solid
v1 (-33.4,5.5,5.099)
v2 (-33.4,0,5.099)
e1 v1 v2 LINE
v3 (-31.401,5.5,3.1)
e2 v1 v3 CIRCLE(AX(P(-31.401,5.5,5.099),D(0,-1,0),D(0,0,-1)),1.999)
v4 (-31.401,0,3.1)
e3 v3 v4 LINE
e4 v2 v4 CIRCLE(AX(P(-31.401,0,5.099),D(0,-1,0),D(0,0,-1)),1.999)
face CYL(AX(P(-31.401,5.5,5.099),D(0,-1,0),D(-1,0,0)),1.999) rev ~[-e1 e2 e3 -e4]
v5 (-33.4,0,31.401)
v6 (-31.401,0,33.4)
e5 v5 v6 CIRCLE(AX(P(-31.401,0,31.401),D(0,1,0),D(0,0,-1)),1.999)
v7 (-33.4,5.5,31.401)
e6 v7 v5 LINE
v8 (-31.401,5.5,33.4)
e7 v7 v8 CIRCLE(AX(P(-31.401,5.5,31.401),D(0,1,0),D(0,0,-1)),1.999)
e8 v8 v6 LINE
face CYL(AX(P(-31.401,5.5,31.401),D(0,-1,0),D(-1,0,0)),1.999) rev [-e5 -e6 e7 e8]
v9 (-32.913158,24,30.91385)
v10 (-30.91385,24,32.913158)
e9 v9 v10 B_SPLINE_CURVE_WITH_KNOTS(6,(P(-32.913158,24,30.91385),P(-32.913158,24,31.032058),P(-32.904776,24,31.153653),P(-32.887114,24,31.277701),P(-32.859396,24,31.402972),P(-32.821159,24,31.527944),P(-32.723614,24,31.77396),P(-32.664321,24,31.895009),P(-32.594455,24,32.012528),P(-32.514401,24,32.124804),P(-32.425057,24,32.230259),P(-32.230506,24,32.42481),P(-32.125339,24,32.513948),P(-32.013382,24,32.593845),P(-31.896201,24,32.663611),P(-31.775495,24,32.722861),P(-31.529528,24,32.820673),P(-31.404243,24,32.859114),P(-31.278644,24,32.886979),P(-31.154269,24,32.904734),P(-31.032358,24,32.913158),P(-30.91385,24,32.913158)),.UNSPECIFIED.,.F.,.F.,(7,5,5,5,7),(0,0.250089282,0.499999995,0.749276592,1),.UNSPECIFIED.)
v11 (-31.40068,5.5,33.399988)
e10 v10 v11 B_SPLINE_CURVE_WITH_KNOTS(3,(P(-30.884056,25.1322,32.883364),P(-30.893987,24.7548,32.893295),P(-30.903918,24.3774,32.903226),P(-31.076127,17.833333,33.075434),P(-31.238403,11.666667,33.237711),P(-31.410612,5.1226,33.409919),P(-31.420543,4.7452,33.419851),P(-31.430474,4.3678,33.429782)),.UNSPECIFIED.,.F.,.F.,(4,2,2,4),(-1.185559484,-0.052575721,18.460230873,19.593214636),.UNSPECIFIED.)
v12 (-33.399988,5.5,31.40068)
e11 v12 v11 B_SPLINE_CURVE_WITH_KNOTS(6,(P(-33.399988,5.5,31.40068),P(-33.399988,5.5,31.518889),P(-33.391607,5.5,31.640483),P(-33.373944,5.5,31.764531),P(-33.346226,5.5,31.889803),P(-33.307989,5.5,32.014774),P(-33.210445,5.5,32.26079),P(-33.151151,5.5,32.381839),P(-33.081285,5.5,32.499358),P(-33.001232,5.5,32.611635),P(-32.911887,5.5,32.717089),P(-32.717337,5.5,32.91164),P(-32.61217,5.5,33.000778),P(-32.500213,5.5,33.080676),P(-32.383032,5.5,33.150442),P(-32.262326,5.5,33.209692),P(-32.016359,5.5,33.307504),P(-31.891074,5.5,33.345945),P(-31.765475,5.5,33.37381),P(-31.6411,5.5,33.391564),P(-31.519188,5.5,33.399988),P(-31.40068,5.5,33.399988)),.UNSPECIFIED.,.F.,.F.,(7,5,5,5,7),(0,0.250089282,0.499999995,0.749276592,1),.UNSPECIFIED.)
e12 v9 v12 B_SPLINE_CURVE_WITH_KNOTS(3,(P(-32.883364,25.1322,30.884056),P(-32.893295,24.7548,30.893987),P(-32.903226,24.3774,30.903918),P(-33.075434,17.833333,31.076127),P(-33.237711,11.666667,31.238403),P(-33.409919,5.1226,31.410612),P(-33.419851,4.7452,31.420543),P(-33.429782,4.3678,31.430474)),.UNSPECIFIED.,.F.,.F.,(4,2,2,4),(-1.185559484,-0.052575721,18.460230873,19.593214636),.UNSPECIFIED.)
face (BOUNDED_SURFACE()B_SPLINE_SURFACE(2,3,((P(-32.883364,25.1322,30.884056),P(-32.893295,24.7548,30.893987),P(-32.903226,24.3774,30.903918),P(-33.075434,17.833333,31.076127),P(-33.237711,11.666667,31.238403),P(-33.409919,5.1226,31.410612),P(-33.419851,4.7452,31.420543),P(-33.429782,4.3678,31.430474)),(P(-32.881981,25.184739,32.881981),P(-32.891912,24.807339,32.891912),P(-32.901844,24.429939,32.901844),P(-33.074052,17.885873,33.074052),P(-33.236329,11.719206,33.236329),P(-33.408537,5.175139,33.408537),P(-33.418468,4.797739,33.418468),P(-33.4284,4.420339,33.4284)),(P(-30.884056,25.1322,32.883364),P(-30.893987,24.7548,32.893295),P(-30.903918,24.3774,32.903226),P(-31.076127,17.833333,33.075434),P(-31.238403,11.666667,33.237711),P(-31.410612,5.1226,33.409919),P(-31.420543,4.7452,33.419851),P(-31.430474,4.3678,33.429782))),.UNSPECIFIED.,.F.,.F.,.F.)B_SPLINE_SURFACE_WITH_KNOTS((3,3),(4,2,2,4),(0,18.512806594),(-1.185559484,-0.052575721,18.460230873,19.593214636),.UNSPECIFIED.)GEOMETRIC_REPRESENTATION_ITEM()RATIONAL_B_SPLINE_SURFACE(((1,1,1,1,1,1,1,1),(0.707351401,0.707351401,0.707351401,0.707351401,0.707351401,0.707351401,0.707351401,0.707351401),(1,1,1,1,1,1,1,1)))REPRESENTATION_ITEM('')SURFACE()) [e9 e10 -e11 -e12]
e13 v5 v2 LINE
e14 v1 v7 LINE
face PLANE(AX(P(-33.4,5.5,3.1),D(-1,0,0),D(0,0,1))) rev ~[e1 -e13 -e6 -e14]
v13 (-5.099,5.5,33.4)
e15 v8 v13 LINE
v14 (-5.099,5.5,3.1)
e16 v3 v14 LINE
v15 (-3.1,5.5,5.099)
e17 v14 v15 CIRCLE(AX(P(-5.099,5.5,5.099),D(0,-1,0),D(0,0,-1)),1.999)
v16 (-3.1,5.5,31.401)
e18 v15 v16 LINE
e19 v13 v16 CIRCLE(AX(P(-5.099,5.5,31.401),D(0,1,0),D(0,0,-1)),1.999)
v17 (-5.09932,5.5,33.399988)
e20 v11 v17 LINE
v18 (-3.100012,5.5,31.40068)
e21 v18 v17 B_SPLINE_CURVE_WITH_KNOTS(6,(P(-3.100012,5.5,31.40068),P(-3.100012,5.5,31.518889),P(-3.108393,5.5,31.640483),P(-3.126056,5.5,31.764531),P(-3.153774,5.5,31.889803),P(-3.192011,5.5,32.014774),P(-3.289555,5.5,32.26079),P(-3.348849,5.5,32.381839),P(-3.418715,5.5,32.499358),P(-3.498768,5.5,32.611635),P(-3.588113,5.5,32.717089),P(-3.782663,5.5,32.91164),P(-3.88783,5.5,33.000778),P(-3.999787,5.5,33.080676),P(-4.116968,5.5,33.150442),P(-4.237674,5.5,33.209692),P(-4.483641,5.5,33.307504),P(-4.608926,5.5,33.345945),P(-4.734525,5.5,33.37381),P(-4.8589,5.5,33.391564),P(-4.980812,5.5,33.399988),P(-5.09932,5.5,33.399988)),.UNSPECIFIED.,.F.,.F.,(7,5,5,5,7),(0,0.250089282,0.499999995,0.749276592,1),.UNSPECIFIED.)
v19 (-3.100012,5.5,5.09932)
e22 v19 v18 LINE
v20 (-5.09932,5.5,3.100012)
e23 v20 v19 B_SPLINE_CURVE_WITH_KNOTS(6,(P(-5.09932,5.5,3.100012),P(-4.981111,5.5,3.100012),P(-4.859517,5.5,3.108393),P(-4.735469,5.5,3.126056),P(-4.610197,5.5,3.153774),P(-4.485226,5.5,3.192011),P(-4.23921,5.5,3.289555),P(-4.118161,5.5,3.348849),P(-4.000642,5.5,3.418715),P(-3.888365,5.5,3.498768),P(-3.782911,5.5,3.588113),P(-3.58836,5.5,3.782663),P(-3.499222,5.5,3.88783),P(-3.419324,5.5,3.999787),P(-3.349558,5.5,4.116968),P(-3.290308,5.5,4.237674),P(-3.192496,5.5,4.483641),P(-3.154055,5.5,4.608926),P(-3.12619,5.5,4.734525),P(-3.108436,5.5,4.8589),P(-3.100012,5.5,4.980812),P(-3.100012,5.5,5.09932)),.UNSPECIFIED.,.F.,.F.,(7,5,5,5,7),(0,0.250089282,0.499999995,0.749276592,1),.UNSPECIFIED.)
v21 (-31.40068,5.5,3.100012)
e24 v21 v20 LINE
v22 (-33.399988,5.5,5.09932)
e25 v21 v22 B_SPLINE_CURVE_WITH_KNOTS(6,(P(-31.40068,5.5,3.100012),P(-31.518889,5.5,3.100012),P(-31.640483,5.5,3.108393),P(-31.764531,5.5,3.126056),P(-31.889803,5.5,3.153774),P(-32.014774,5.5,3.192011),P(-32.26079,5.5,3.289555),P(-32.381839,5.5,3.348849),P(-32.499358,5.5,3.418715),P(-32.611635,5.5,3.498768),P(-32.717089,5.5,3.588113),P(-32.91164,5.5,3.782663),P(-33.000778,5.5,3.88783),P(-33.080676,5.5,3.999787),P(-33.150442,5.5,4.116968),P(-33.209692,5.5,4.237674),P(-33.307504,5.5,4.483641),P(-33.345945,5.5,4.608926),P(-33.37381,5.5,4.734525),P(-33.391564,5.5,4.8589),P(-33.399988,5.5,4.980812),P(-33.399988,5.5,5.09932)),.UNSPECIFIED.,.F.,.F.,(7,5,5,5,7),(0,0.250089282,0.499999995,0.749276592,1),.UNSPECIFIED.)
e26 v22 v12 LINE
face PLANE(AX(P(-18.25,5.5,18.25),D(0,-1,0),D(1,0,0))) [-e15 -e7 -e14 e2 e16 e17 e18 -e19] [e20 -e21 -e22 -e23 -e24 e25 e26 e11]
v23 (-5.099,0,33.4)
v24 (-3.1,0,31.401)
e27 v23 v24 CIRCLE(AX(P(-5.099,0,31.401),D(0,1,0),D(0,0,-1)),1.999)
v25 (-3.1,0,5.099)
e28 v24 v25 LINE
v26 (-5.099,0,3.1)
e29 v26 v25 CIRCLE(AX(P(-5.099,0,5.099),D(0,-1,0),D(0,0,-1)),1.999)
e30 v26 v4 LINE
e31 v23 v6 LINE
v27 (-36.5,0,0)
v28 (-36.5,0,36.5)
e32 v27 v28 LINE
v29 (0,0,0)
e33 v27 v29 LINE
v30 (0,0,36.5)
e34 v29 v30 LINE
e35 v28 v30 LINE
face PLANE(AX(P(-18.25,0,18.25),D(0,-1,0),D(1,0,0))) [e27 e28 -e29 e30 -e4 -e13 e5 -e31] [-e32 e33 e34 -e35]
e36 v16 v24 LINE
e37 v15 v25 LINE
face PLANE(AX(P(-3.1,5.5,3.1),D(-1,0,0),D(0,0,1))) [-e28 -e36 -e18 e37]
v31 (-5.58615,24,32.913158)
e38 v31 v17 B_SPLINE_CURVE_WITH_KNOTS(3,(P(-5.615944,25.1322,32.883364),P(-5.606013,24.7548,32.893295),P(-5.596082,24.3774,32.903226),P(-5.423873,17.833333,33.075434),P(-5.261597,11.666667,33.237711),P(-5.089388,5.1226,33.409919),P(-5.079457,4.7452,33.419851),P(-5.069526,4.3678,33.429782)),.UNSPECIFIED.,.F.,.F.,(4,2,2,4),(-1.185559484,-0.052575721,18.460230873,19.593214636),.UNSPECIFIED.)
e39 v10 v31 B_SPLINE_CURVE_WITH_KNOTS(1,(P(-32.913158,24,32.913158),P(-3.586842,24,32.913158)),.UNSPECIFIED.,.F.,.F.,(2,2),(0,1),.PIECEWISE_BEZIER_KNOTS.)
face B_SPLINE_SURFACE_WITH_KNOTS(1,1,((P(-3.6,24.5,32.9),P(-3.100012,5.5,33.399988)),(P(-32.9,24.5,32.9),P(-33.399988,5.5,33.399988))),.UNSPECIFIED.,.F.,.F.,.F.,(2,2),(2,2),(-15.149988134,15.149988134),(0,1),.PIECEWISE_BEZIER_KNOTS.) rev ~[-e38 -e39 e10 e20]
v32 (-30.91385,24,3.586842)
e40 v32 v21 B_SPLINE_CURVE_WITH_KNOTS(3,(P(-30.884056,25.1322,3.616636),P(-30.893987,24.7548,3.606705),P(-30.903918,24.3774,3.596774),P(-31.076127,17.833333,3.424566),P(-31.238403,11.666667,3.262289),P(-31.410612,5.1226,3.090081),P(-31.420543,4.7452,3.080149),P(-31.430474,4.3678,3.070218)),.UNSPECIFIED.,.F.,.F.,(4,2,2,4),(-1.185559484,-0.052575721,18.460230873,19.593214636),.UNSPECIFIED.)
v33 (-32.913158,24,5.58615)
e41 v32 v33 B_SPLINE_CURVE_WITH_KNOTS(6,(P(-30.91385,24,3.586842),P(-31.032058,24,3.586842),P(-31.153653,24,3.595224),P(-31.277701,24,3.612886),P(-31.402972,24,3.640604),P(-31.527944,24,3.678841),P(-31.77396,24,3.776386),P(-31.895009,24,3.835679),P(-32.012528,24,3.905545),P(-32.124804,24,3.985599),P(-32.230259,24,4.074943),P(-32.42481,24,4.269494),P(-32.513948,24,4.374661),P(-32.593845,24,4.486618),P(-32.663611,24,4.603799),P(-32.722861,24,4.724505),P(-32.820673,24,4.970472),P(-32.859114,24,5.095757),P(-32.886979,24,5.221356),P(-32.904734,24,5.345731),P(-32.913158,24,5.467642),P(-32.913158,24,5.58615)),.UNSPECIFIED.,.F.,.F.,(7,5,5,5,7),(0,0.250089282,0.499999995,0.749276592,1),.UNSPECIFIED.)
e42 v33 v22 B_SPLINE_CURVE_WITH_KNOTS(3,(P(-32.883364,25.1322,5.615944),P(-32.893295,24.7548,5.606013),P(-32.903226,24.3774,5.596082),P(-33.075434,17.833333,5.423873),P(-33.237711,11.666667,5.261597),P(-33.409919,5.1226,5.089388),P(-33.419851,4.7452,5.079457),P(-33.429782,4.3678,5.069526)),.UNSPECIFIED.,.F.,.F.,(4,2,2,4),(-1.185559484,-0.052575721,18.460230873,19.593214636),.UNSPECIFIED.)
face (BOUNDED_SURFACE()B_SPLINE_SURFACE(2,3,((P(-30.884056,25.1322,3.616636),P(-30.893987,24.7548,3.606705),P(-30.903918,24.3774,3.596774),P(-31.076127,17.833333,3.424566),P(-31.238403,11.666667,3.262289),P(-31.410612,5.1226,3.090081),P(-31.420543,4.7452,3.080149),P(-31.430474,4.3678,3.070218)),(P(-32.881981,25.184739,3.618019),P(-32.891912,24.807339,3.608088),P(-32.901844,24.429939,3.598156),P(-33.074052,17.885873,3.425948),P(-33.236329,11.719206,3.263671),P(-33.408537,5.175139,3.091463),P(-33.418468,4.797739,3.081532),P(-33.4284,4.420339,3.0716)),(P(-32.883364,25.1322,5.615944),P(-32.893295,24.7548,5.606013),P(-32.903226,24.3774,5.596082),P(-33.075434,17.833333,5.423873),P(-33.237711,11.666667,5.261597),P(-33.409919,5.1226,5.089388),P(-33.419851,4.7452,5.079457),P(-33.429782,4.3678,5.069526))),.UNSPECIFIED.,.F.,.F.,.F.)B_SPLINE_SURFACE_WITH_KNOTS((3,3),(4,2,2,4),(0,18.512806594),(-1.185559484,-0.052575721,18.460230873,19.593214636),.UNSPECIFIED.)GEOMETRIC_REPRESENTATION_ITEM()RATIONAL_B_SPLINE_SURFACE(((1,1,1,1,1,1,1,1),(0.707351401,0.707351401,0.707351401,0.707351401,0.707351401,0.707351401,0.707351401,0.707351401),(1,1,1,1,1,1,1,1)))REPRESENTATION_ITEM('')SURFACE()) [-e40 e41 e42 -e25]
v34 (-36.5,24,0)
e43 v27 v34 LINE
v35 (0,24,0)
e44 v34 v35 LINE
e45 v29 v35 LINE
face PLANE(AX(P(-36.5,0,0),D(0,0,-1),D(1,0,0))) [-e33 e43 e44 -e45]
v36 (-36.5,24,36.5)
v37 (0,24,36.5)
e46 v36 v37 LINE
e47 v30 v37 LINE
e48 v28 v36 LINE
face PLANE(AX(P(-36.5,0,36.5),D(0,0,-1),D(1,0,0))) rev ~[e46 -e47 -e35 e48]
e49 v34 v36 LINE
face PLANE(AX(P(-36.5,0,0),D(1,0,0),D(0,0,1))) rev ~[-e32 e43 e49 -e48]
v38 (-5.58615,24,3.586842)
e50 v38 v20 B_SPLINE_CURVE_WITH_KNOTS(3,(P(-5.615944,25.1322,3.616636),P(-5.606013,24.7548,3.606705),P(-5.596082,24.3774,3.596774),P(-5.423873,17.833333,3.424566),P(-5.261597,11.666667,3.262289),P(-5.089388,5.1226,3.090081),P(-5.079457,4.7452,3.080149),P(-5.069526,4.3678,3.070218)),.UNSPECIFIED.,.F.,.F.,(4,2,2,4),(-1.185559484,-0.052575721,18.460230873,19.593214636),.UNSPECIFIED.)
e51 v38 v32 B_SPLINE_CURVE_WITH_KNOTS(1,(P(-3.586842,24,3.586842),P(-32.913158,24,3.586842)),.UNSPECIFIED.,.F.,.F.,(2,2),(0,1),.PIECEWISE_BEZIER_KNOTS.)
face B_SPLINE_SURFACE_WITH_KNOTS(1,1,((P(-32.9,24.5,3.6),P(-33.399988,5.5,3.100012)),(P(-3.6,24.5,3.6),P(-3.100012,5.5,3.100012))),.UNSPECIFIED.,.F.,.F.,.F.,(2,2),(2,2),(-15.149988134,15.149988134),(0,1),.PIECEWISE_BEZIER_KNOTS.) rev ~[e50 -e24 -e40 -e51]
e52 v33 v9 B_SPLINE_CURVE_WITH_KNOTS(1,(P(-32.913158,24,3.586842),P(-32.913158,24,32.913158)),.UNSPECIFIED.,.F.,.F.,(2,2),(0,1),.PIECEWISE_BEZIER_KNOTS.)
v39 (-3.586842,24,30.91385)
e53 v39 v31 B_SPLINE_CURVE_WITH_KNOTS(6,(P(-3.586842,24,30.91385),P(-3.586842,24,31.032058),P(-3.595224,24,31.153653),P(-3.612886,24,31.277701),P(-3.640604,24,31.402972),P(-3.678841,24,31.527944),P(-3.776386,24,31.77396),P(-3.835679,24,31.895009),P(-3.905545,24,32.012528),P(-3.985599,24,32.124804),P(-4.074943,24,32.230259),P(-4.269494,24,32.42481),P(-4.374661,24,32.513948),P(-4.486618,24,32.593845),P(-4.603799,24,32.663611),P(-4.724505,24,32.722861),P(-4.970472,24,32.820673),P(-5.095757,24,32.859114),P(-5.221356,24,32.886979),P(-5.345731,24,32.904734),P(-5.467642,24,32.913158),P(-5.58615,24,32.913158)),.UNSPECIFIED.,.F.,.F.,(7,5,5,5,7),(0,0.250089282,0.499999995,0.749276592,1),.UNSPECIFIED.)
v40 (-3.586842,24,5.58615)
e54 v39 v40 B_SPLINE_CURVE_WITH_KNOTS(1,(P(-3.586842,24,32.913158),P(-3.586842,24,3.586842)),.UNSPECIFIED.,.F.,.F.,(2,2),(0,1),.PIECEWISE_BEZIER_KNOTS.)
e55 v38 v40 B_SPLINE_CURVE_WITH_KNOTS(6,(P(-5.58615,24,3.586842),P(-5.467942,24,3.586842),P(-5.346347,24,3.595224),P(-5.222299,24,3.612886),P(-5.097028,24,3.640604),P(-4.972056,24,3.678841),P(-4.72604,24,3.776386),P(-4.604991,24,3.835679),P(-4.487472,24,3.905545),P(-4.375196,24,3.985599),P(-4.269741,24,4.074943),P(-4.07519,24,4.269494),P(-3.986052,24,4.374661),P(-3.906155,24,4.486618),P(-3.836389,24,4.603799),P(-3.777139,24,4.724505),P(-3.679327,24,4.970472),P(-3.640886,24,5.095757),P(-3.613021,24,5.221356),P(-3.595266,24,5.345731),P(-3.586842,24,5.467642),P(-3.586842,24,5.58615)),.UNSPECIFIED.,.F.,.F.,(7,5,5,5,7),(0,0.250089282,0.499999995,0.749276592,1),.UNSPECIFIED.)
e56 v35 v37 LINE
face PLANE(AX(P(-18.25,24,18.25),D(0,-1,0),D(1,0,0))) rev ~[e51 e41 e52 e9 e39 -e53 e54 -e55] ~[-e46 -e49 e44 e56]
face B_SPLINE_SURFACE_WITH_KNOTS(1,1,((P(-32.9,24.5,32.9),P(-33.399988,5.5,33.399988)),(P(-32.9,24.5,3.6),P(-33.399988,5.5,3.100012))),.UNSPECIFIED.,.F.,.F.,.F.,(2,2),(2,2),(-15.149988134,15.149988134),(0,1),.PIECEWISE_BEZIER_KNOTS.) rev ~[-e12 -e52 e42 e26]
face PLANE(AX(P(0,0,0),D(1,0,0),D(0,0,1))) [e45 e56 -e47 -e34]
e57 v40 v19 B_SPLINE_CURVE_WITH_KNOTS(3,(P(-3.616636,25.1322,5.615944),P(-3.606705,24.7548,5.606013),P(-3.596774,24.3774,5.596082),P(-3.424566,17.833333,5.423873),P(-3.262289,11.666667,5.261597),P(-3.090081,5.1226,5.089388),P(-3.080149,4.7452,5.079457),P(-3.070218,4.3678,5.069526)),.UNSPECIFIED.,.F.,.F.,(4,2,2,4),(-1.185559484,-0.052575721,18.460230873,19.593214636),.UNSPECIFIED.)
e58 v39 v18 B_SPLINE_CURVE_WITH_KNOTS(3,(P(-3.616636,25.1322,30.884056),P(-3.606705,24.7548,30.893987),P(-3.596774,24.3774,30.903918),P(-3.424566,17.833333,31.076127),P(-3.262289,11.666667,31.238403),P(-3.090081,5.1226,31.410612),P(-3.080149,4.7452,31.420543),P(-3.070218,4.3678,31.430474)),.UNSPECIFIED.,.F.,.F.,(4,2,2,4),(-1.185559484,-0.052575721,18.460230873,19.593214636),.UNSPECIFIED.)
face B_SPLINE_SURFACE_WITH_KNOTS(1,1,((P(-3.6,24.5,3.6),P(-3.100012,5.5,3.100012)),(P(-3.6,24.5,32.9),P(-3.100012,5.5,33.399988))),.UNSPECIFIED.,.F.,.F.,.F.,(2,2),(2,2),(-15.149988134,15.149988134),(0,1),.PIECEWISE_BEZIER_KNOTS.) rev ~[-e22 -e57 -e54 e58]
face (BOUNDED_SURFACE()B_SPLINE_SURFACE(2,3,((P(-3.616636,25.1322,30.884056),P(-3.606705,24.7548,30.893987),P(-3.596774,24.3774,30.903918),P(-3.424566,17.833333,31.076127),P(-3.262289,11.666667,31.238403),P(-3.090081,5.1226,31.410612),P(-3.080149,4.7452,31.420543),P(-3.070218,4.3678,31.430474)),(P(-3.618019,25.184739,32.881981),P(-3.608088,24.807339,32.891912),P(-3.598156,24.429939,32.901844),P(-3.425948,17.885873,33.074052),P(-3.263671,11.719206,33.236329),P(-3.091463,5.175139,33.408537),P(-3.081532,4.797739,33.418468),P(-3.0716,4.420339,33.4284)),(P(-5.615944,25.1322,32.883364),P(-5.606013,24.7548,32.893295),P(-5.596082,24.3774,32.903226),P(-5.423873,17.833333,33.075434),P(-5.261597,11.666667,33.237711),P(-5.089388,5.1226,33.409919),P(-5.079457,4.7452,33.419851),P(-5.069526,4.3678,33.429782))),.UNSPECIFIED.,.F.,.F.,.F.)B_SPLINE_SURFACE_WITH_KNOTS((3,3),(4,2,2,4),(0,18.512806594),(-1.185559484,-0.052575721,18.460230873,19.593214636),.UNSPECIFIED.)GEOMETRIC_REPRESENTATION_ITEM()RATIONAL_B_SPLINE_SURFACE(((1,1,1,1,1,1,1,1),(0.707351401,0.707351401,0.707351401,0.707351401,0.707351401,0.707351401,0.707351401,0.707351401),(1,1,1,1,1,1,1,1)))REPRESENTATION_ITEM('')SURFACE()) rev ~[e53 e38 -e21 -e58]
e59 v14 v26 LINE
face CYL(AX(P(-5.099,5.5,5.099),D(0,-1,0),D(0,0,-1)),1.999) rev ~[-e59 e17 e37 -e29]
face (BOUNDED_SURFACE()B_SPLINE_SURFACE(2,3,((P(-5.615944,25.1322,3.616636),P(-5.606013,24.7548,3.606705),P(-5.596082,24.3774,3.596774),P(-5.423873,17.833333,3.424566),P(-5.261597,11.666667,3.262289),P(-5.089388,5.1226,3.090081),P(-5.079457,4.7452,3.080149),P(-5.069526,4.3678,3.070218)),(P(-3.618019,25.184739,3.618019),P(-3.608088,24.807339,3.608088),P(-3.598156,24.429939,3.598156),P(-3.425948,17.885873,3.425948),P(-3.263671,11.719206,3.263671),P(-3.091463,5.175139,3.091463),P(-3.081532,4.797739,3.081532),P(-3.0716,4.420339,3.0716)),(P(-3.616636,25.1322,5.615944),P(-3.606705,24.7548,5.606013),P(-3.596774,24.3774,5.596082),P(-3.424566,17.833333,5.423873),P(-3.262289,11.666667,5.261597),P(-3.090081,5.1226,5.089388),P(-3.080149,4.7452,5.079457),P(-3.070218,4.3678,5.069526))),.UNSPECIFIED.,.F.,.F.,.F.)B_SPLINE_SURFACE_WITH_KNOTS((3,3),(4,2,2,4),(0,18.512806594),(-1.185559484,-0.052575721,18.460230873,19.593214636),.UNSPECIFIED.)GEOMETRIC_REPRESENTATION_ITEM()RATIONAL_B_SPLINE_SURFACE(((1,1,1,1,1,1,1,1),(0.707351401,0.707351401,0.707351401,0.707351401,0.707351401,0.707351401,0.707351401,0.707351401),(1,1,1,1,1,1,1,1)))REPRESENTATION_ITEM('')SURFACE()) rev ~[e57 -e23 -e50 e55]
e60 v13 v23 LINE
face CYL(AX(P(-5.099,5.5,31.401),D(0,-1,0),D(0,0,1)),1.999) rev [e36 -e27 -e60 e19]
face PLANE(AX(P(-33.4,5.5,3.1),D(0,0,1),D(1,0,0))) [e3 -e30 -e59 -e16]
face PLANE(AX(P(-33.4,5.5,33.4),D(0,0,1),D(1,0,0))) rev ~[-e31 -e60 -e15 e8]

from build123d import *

# Parameters (mm, degrees)
F0_W     = 36.5
F0_H     = 36.5
F5_DEPTH = 24
F4_W     = 29.3
F4_H     = 29.3
F6_DEPTH = 19
F6_TAPER = -1.5074
F2_W     = 30.3
F2_H     = 30.3
F7_DEPTH = 5.501
F8_R     = 2
F8_R_2   = 1.999


# Not quite as in the source:
# - a fillet or chamfer is up to 0.001 mm smaller than in the source, because OpenCascade refuses the exact size


with BuildPart() as f5:
    # F0 (on Front) → F5 (new body)
    with BuildSketch(Plane.XZ):
        with Locations((-18.25, 18.25)):
            Rectangle(F0_W, F0_H)
    extrude(amount=-F5_DEPTH)

    # F4 (on offset) → F6 (cut)
    with BuildSketch(Plane.XZ.offset(-24.5)):
        with Locations((-18.25, 18.25)):
            Rectangle(F4_W, F4_H)
    extrude(amount=F6_DEPTH, taper=F6_TAPER, mode=Mode.SUBTRACT)

    # F2 (on offset) → F7 (cut, through all)
    with BuildSketch(Plane.XZ.offset(-5.5)):
        with Locations((-18.25, 18.25)):
            Rectangle(F2_W, F2_H)
    extrude(amount=F7_DEPTH, mode=Mode.SUBTRACT)

    # F8 (call 1 of 8: OpenCascade refuses the feature's edges together)
    f8_edges = [f5.edges().sort_by_distance(p)[0] for p in [
        (-3.343427, 14.75, 33.156573),
    ]]
    fillet(f8_edges, radius=F8_R)

    # F8#2 (call 2 of 8) (radius 2 in the source; OpenCascade refuses exactly that, so slightly less here)
    f8_2_edges = [f5.edges().sort_by_distance(p)[0] for p in [
        (-3.1, 2.75, 33.4),
    ]]
    fillet(f8_2_edges, radius=F8_R_2)

    # F8#3 (call 3 of 8)
    f8_3_edges = [f5.edges().sort_by_distance(p)[0] for p in [
        (-33.156573, 14.75, 3.343427),
    ]]
    fillet(f8_3_edges, radius=F8_R)

    # F8#4 (call 4 of 8) (radius 2 in the source; OpenCascade refuses exactly that, so slightly less here)
    f8_4_edges = [f5.edges().sort_by_distance(p)[0] for p in [
        (-33.4, 2.75, 3.1),
    ]]
    fillet(f8_4_edges, radius=F8_R_2)

    # F8#5 (call 5 of 8)
    f8_5_edges = [f5.edges().sort_by_distance(p)[0] for p in [
        (-33.156573, 14.75, 33.156573),
    ]]
    fillet(f8_5_edges, radius=F8_R)

    # F8#6 (call 6 of 8) (radius 2 in the source; OpenCascade refuses exactly that, so slightly less here)
    f8_6_edges = [f5.edges().sort_by_distance(p)[0] for p in [
        (-33.4, 2.75, 33.4),
    ]]
    fillet(f8_6_edges, radius=F8_R_2)

    # F8#7 (call 7 of 8)
    f8_7_edges = [f5.edges().sort_by_distance(p)[0] for p in [
        (-3.343427, 14.75, 3.343427),
    ]]
    fillet(f8_7_edges, radius=F8_R)

    # F8#8 (call 8 of 8) (radius 2 in the source; OpenCascade refuses exactly that, so slightly less here)
    f8_8_edges = [f5.edges().sort_by_distance(p)[0] for p in [
        (-3.1, 2.75, 3.1),
    ]]
    fillet(f8_8_edges, radius=F8_R_2)


solid = f5.part
